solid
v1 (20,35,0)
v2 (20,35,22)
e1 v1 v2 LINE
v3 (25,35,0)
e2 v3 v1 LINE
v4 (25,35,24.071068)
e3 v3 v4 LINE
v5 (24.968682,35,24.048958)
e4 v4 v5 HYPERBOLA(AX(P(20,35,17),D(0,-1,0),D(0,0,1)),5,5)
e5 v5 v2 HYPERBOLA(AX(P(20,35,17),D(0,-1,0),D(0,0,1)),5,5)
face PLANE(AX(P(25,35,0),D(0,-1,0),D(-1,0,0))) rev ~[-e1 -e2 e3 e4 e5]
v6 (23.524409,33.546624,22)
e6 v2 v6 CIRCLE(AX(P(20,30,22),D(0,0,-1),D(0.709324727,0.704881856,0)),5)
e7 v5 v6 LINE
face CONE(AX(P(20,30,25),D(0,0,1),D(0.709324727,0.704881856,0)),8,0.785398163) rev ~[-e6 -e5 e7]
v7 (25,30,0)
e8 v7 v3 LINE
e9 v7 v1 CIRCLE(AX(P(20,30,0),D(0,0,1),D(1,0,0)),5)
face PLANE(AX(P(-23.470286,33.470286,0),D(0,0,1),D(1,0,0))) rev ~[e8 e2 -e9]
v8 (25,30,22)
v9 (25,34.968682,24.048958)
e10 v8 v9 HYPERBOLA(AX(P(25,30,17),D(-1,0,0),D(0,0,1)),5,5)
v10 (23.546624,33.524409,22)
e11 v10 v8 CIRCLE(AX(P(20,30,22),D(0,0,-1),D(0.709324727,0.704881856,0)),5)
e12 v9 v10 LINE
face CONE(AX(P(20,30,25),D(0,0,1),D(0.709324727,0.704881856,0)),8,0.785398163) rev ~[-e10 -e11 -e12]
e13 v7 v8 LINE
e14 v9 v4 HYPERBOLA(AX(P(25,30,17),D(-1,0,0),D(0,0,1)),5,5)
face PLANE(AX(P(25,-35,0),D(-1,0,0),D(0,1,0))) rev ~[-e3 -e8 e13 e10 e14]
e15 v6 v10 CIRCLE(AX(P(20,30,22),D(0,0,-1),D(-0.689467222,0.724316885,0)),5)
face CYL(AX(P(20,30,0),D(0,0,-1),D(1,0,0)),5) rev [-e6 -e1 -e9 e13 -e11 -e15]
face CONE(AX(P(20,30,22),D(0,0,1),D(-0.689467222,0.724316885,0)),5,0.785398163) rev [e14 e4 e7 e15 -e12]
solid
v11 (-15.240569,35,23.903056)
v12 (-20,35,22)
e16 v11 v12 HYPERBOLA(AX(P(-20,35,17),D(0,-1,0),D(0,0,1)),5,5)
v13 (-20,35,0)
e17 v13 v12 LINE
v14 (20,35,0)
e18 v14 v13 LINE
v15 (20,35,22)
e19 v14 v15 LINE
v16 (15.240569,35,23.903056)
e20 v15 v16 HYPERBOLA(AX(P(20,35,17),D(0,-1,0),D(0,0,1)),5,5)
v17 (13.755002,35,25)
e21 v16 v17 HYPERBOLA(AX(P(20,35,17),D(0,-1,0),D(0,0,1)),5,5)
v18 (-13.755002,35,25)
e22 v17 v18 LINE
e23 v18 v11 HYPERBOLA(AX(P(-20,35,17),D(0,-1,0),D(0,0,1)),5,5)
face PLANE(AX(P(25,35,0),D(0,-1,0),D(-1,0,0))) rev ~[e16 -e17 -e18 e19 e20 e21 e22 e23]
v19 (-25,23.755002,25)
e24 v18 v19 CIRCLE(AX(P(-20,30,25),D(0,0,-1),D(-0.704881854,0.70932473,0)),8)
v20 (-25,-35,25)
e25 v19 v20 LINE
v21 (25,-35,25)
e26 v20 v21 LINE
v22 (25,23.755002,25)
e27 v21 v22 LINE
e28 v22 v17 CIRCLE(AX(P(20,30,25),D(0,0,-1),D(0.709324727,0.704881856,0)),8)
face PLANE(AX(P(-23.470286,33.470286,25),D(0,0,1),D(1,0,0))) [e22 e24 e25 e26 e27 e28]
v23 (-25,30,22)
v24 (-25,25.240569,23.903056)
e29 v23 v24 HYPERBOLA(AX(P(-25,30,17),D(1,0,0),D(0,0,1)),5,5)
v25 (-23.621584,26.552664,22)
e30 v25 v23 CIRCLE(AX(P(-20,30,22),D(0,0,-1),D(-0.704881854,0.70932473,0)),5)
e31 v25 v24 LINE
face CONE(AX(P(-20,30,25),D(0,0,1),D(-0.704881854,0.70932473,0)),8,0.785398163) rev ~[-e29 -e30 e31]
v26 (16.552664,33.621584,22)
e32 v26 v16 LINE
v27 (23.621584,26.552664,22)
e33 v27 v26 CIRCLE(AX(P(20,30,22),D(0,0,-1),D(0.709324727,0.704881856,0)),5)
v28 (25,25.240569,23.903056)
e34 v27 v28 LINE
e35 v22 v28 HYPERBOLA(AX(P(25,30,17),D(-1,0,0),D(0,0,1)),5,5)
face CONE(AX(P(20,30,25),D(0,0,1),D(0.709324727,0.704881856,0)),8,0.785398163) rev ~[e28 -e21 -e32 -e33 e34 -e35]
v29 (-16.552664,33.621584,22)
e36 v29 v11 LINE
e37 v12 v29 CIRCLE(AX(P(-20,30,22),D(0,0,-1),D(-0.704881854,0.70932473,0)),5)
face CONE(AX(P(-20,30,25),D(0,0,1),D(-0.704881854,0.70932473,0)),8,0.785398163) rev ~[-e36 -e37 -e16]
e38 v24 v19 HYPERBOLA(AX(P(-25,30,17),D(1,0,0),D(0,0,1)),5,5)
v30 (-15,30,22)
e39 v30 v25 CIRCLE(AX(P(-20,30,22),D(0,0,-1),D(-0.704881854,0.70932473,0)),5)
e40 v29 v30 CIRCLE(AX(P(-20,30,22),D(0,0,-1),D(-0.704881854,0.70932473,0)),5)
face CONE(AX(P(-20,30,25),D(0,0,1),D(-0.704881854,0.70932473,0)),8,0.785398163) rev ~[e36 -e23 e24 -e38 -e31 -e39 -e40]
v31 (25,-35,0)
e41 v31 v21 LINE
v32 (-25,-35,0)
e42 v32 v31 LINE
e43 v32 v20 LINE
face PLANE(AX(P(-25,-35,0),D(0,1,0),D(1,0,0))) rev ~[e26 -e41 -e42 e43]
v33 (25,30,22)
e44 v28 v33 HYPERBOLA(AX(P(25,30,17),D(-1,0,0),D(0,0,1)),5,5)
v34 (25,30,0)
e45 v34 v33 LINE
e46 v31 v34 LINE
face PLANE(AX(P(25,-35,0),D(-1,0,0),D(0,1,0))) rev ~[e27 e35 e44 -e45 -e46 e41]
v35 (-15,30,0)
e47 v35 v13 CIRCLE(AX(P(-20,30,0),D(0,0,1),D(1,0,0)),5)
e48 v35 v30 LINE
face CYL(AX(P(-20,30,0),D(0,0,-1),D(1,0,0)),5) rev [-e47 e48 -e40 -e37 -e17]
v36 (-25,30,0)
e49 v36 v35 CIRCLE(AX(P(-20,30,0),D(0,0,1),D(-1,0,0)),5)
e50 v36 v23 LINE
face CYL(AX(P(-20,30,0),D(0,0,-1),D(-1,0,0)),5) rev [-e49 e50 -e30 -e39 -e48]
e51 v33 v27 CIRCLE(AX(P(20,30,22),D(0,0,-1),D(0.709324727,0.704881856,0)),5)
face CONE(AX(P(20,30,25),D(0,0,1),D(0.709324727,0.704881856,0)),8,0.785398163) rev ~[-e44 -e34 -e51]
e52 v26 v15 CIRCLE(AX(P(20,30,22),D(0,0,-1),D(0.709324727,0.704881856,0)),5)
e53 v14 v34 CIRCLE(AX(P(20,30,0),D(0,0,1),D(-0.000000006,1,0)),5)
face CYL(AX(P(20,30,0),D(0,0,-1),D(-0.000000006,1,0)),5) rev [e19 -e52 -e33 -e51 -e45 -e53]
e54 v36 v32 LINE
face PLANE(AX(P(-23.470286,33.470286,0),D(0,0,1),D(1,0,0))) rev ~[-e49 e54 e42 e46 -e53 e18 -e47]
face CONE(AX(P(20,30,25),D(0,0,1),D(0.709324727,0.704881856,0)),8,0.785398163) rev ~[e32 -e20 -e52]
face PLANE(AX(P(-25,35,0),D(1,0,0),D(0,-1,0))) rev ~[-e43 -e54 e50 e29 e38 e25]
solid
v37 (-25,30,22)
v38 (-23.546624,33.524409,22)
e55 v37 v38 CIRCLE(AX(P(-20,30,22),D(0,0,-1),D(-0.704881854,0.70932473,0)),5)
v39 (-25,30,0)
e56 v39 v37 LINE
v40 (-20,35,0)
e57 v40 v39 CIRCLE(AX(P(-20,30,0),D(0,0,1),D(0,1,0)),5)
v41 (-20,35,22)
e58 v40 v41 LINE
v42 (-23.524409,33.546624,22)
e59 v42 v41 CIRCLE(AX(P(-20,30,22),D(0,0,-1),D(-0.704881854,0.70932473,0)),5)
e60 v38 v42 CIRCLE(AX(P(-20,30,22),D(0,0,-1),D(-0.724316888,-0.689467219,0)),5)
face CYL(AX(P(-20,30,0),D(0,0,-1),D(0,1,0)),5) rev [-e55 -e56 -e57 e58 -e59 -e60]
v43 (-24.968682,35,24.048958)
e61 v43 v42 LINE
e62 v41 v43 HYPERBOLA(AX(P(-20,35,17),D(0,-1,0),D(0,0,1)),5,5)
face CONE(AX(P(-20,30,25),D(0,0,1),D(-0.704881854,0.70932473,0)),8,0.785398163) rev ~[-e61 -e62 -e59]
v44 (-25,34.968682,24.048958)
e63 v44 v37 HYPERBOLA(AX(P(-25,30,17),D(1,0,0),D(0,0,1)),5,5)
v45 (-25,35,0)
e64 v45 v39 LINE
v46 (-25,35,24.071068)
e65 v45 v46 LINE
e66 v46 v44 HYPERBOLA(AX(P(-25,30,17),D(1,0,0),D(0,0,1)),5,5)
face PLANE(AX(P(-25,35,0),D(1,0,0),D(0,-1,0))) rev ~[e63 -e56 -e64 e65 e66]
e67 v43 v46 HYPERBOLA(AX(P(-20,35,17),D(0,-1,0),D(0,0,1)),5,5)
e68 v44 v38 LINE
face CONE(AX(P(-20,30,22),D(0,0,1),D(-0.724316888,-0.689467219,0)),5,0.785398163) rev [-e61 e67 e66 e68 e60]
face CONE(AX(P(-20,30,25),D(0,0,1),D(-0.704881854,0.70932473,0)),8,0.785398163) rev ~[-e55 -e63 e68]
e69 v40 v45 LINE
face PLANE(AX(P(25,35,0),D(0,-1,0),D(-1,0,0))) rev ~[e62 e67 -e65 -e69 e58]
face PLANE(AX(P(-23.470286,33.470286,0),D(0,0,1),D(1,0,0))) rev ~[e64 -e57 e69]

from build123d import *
from build123d import SkipClean  # not in build123d's __all__

# Parameters (mm, degrees)
F1_DEPTH       = 25
F2_DEPTH       = 25.001
F3_T2_ANGLE    = 359.64
F3_T4_ANGLE    = 359.64
F4_T2_ANGLE    = 177.1758988834
F4_S1_T2_ANGLE = 177.1758988834


# Not quite as in the source:
# - a fillet or chamfer that OpenCascade refuses, or shapes differently, is made with other operations: its cross-section is extruded or revolved along the edge and cut away or added


with BuildPart() as f1:
    # F0 (on Top) → F1 (new body)
    with BuildSketch(Plane.XY):
        with BuildLine():
            Line((-20, 35), (-25, 35))
            Line((-25, 35), (-25, 30))
            ThreePointArc((-25, 30), (-23.5355339059, 33.5355339059), (-20, 35))
        make_face()
        with BuildLine():
            Line((19.9999999695, 35), (-20, 35))
            ThreePointArc((-20, 35), (-16.4644660941, 33.5355339059), (-15, 30))
            ThreePointArc((-15, 30), (-20, 25), (-25, 30))
            Line((-25, 30), (-25, -35))
            Line((-25, -35), (25, -35))
            Line((25, -35), (25, 30))
            ThreePointArc((25, 30), (16.4644661049, 26.4644660833), (19.9999999695, 35))
        make_face()
        with BuildLine():
            ThreePointArc((-15, 30), (-16.4644660941, 33.5355339059), (-20, 35))
            ThreePointArc((-20, 35), (-23.5355339059, 33.5355339059), (-25, 30))
            ThreePointArc((-25, 30), (-20, 25), (-15, 30))
        make_face()
        with BuildLine():
            Line((25, 35), (19.9999999695, 35))
            ThreePointArc((19.9999999695, 35), (23.5355338951, 33.5355339167), (25, 30))
            Line((25, 30), (25, 35))
        make_face()
        with BuildLine():
            ThreePointArc((25, 30), (23.5355338951, 33.5355339167), (19.9999999695, 35))
            ThreePointArc((19.9999999695, 35), (16.4644661049, 26.4644660833), (25, 30))
        make_face()
    extrude(amount=F1_DEPTH)

    # F0 (on Top) → F2 (cut, through all)
    with BuildSketch(Plane.XY):
        with BuildLine():
            ThreePointArc((-15, 30), (-16.4644660941, 33.5355339059), (-20, 35))
            ThreePointArc((-20, 35), (-23.5355339059, 33.5355339059), (-25, 30))
            ThreePointArc((-25, 30), (-20, 25), (-15, 30))
        make_face()
        with BuildLine():
            ThreePointArc((25, 30), (23.5355338951, 33.5355339167), (19.9999999695, 35))
            ThreePointArc((19.9999999695, 35), (16.4644661049, 26.4644660833), (25, 30))
        make_face()
    extrude(amount=F2_DEPTH, mode=Mode.SUBTRACT)

    # F3: chamfer of 3 on 2 edges, made by hand

    # F3_s1 → F3_t2 (revolve, cut)
    with BuildSketch(Plane(origin=(-5.062535292, 5.0944444589, 0), x_dir=(0, 0, 1), z_dir=(-0.7048818561, 0.7093247274, 0))):
        Polygon((25, 43.3329502316), (22, 40.3329502316), (25, 40.3329502316), align=None)
    revolve(axis=Axis((20, 30, 25), (0, 0, -1)), revolution_arc=F3_T2_ANGLE, mode=Mode.SUBTRACT)

    # F3_s3 → F3_t4 (revolve, cut)
    with BuildSketch(Plane(origin=(4.9368724732, 4.905950232, 0), x_dir=(0, 0, 1), z_dir=(-0.7093247296, -0.7048818539, 0))):
        Polygon((25, 43.377378966), (22, 40.377378966), (25, 40.377378966), align=None)
    revolve(axis=Axis((-20, 30, 25), (0, 0, -1)), revolution_arc=F3_T4_ANGLE, mode=Mode.SUBTRACT)

    # F4: chamfer of 3 on 1 edges, made by hand

    # F4_s1 → F4_t2 (revolve, cut)
    with BuildSketch(Plane(origin=(-24.4890834382, 25.7269036129, 0), x_dir=(0, 0, 1), z_dir=(0.6894672193, -0.7243168875, 0))):
        Polygon((22, -1.1976788275), (25, 1.8023211725), (25, -1.1976788275), align=None)
    with SkipClean():  # cleaning this boolean's faces spoils the solid; the shape is the same uncleaned
        revolve(axis=Axis((-20, 30, 25), (0, 0, -1)), revolution_arc=F4_T2_ANGLE, mode=Mode.SUBTRACT)

    # F4#s1: chamfer of 3 on 1 edges, made by hand

    # F4_s1_s1 → F4_s1_t2 (revolve, cut)
    with BuildSketch(Plane(origin=(25.4744815239, 24.2488064941, 0), x_dir=(0, 0, 1), z_dir=(-0.7243168854, -0.6894672215, 0))):
        Polygon((22, 12.940162133), (25, 15.940162133), (25, 12.940162133), align=None)
    with SkipClean():  # cleaning this boolean's faces spoils the solid; the shape is the same uncleaned
        revolve(axis=Axis((20, 30, 25), (0, 0, -1)), revolution_arc=F4_S1_T2_ANGLE, mode=Mode.SUBTRACT)


solid = f1.part
